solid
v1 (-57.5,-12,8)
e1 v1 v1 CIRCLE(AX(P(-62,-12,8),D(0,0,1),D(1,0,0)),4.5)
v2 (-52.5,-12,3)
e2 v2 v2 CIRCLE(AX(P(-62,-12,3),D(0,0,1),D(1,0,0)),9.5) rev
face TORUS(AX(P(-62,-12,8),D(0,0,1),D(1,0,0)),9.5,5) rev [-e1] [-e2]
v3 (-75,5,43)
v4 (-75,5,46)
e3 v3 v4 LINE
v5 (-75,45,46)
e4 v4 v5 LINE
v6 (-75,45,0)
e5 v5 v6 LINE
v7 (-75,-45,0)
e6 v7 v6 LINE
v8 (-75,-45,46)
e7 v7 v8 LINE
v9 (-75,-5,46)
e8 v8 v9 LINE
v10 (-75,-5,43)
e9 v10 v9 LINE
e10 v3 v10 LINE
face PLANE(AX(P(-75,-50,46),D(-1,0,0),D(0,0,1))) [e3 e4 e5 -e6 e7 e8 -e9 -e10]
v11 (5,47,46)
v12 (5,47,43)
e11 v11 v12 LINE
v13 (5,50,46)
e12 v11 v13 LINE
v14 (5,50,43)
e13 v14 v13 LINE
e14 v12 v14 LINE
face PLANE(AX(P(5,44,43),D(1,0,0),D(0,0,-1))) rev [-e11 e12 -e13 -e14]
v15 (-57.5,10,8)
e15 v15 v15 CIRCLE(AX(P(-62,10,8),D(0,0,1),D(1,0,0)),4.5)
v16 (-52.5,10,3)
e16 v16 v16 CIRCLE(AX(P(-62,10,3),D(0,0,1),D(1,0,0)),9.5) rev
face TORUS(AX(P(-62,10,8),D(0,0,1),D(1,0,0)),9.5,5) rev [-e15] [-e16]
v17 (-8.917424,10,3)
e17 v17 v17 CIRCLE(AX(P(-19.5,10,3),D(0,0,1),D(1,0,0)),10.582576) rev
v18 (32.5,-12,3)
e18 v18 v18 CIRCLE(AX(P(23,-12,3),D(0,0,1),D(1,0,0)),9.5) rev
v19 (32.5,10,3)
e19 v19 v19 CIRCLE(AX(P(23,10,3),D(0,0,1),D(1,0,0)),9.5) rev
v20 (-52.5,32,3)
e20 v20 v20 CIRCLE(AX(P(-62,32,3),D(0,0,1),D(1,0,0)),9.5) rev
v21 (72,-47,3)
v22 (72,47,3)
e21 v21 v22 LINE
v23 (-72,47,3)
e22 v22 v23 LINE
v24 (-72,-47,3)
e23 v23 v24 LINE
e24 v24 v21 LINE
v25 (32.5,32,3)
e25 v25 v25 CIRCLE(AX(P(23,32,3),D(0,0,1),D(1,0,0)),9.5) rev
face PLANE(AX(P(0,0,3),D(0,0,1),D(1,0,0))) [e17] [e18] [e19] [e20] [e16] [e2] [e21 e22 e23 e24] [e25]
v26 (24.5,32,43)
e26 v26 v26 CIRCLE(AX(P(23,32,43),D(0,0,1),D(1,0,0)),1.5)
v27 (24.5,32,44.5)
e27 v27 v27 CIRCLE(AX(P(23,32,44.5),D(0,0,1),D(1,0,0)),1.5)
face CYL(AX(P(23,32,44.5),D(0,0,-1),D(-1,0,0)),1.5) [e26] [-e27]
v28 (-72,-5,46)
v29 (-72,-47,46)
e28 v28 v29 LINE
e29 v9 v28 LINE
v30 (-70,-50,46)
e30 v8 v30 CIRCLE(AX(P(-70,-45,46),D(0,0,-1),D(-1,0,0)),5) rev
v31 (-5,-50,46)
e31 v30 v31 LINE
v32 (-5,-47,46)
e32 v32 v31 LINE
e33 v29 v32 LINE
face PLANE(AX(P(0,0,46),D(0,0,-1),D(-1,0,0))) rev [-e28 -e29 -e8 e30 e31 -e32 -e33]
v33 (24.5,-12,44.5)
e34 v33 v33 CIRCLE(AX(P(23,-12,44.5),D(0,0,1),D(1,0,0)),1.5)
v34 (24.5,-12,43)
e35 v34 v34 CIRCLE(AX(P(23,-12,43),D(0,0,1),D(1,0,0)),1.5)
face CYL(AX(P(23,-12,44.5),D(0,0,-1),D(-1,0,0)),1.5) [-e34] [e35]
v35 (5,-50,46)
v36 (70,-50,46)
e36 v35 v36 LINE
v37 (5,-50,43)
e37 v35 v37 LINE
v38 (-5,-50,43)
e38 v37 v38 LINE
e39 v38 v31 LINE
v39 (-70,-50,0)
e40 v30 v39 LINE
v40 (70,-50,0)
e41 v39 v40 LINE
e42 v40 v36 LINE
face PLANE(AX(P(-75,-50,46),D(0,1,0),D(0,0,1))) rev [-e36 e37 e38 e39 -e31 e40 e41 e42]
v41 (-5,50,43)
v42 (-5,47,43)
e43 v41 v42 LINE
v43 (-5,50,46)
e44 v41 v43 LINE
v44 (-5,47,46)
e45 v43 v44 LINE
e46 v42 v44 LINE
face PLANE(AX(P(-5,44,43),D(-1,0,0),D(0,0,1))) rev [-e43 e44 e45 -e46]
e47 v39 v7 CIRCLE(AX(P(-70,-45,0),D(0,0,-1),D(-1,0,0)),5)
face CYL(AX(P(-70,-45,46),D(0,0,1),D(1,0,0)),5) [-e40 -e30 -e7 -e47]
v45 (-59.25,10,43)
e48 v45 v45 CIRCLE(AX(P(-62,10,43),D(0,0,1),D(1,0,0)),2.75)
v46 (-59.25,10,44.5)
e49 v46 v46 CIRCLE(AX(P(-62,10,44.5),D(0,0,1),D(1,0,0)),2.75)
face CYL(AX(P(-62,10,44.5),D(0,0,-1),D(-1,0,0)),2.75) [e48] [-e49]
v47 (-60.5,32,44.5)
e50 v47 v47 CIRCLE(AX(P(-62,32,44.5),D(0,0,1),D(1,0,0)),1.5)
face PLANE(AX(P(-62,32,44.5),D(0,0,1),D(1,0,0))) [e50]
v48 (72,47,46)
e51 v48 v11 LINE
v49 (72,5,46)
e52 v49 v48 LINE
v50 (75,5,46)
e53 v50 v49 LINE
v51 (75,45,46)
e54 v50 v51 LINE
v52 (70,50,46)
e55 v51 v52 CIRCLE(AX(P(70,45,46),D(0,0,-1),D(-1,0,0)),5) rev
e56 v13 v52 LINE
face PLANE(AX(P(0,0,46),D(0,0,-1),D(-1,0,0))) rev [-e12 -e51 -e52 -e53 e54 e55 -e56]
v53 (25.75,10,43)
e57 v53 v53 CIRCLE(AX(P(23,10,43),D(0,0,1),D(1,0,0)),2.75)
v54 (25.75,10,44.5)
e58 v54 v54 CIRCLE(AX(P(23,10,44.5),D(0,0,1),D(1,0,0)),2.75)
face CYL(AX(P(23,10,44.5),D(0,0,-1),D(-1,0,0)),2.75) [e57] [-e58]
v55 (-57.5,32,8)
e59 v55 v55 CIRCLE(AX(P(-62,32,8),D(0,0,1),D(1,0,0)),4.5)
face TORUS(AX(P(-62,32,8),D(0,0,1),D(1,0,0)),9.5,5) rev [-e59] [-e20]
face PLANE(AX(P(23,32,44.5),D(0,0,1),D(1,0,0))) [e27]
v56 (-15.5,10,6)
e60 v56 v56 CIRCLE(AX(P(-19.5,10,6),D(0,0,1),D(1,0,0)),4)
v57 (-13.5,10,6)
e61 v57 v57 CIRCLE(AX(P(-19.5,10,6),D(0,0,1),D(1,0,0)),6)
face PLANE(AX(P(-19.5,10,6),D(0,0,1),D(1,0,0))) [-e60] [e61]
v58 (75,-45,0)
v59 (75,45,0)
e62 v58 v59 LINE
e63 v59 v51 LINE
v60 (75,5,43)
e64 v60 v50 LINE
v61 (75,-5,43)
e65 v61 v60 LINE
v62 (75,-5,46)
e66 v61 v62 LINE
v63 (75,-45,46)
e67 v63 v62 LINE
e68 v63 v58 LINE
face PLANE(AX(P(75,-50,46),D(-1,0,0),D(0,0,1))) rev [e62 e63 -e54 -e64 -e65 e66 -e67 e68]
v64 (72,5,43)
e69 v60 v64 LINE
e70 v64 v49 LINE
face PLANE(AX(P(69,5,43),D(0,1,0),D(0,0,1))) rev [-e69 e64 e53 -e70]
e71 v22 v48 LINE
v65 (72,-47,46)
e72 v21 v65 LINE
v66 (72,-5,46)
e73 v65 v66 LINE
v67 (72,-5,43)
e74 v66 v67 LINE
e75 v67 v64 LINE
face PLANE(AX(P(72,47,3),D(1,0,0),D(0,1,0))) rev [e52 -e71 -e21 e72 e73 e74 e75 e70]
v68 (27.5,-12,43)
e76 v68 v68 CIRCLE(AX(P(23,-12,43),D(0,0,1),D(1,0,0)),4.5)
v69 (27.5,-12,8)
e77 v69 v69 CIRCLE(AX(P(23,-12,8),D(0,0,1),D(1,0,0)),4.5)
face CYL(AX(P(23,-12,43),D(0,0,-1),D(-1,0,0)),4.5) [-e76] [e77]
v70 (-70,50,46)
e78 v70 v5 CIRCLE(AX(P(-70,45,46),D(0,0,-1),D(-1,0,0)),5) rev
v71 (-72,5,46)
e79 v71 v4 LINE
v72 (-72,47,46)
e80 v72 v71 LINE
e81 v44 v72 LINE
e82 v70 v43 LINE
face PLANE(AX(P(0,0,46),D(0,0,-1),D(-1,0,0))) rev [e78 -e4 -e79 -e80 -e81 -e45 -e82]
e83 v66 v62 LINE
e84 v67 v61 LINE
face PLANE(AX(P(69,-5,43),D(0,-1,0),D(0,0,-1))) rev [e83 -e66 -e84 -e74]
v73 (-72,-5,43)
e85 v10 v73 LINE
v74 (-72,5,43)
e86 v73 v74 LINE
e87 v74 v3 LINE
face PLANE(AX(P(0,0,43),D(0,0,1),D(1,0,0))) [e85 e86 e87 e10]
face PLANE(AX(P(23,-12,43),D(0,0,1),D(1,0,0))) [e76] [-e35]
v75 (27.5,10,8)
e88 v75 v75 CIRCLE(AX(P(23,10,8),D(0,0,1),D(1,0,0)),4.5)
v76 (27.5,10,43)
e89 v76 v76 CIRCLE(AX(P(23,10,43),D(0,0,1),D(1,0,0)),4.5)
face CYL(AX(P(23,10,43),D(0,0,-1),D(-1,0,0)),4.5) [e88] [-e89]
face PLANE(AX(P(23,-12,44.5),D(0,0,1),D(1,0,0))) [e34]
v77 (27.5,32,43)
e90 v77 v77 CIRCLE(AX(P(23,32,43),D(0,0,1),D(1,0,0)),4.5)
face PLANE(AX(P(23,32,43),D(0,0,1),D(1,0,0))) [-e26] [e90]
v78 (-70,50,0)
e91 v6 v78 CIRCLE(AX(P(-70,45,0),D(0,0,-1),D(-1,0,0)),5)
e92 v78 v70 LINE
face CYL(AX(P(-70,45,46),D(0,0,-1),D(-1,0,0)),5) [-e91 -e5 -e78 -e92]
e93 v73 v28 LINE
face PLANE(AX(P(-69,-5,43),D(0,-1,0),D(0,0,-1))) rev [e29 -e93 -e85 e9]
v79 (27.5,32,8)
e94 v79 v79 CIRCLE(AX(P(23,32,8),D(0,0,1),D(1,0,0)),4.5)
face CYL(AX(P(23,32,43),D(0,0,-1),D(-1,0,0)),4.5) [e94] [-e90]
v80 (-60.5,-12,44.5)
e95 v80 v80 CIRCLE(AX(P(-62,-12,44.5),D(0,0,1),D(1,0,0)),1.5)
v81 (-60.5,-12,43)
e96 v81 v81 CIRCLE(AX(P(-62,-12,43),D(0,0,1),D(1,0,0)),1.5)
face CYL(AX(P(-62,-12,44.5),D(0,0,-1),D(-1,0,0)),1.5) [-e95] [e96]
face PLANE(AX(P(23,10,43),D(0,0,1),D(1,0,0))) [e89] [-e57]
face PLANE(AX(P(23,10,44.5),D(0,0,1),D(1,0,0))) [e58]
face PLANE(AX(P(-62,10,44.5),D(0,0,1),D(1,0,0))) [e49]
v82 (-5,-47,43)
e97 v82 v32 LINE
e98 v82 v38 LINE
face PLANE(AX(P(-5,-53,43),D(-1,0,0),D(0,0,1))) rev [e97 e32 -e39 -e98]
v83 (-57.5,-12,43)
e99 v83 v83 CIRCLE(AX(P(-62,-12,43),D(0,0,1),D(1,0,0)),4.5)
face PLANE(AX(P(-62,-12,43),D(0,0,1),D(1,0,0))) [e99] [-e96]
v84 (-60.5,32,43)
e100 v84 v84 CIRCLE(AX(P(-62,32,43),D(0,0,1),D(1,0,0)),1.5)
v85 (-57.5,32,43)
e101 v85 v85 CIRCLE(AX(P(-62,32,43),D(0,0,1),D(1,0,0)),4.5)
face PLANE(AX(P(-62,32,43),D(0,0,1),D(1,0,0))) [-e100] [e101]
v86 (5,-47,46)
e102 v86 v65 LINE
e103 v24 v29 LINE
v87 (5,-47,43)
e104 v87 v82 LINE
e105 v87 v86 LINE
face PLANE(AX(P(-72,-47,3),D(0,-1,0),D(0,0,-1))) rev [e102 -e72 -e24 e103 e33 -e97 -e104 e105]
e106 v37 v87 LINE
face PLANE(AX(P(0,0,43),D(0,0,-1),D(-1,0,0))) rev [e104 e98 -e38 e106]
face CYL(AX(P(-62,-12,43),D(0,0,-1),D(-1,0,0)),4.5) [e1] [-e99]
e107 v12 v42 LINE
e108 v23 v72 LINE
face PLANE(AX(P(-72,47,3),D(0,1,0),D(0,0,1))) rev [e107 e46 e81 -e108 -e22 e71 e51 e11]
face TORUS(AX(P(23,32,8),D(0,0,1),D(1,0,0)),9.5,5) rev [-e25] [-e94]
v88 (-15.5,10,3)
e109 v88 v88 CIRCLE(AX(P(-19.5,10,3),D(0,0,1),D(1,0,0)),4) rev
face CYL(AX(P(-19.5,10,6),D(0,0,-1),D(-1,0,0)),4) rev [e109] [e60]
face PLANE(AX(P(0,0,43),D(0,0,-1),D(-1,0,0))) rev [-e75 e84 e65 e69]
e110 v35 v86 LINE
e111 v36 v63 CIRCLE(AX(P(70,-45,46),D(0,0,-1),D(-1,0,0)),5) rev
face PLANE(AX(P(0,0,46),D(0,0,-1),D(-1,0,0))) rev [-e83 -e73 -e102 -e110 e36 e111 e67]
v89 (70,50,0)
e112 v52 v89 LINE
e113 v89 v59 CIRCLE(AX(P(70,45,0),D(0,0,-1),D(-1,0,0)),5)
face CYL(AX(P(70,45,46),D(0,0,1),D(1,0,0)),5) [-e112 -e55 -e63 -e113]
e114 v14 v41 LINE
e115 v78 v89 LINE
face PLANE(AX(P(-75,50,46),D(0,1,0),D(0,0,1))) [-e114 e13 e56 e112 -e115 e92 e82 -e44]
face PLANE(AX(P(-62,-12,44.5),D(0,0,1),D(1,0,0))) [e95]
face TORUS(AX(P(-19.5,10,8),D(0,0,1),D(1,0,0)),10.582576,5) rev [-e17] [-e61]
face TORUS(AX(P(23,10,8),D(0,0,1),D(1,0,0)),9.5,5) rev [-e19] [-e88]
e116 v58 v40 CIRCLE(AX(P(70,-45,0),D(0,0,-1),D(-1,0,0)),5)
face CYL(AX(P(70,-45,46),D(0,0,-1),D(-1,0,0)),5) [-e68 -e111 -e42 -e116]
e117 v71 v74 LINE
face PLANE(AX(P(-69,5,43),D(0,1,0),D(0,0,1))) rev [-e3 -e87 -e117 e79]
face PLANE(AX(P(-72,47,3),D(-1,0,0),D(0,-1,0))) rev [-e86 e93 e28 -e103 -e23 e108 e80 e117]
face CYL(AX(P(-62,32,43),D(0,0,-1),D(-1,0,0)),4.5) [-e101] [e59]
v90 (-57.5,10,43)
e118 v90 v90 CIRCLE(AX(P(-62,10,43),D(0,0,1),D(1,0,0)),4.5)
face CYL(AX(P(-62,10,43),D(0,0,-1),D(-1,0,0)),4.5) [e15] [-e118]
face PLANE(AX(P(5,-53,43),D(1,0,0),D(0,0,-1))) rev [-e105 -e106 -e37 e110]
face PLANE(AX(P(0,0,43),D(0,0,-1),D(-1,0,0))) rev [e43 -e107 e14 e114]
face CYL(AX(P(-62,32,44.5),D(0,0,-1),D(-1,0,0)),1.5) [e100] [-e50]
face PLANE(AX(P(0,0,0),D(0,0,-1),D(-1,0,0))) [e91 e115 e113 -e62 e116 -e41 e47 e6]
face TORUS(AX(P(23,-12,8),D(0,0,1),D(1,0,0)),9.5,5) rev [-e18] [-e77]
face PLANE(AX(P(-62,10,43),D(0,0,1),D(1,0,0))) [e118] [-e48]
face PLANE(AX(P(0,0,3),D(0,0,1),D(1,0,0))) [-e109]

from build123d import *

# Parameters (mm, degrees)
SKETCH_1_W          = 150
SKETCH_1_H          = 100
EXTRUDE_1_DEPTH     = 46
SKETCH_3_W          = 144
SKETCH_3_H          = 94
CUT_EXTRUDE_2_DEPTH = 43
SKETCH_5_R          = 4.5
EXTRUDE_3_DEPTH     = 40
SKETCH_6_R          = 6
SKETCH_6_R_2        = 4
EXTRUDE_4_DEPTH     = 3
SKETCH_7_R          = 1.5
SKETCH_7_R_2        = 2.75
EXTRUDE_5_DEPTH     = 1.5
SKETCH_9_W          = 10
SKETCH_9_H          = 6
SKETCH_9_W_2        = 6
SKETCH_9_H_2        = 10
CUT_EXTRUDE_3_DEPTH = 3
FILLET_1_R          = 5


with BuildPart() as part:
    # 草图1 → 凸台-拉伸1 (new body)
    with BuildSketch(Plane.XY):
        Rectangle(SKETCH_1_W, SKETCH_1_H)
    extrude(amount=EXTRUDE_1_DEPTH)

    # 草图3 → 切除-拉伸2 (cut)
    with BuildSketch(Plane.XY.offset(46)):
        Rectangle(SKETCH_3_W, SKETCH_3_H)
    extrude(amount=-CUT_EXTRUDE_2_DEPTH, mode=Mode.SUBTRACT)

    # 草图5 → 凸台-拉伸3 (add)
    with BuildSketch(Plane.XY.offset(3)):
        with Locations((-62, 32)):
            Circle(SKETCH_5_R)
        with Locations((23, 32)):
            Circle(SKETCH_5_R)
        with Locations((-62, -12)):
            Circle(SKETCH_5_R)
        with Locations((23, -12)):
            Circle(SKETCH_5_R)
        with Locations((23, 10)):
            Circle(SKETCH_5_R)
        with Locations((-62, 10)):
            Circle(SKETCH_5_R)
    extrude(amount=EXTRUDE_3_DEPTH)

    # 草图6 → 凸台-拉伸4 (add)
    with BuildSketch(Plane.XY.offset(3)):
        with Locations((-19.5, 10)):
            Circle(SKETCH_6_R)
        with Locations((-19.5, 10)):
            Circle(SKETCH_6_R_2, mode=Mode.SUBTRACT)
    extrude(amount=EXTRUDE_4_DEPTH)

    # 草图7 → 凸台-拉伸5 (add)
    with BuildSketch(Plane.XY.offset(43)):
        with Locations((-62, 32)):
            Circle(SKETCH_7_R)
        with Locations((23, 32)):
            Circle(SKETCH_7_R)
        with Locations((-62, 10)):
            Circle(SKETCH_7_R_2)
        with Locations((23, 10)):
            Circle(SKETCH_7_R_2)
        with Locations((23, -12)):
            Circle(SKETCH_7_R)
        with Locations((-62, -12)):
            Circle(SKETCH_7_R)
    extrude(amount=EXTRUDE_5_DEPTH)

    # 草图9 → 切除-拉伸3 (cut)
    with BuildSketch(Plane.XY.offset(46)):
        with Locations((0, 47)):
            Rectangle(SKETCH_9_W, SKETCH_9_H)
        with Locations((0, -50)):
            Rectangle(SKETCH_9_W, SKETCH_9_H)
        with Locations((72, 0)):
            Rectangle(SKETCH_9_W_2, SKETCH_9_H_2)
        with Locations((-72, 0)):
            Rectangle(SKETCH_9_W_2, SKETCH_9_H_2)
    extrude(amount=-CUT_EXTRUDE_3_DEPTH, mode=Mode.SUBTRACT)

    # 圆角1
    # the kernel refuses this fillet: 5 mm, written as the material it adds along each edge
    with BuildSketch(Plane(origin=(-62, 32, 3), x_dir=(1, 0, 0), z_dir=(0, -1, 0))) as fillet_1_piece_1:
        with BuildLine():
            CenterArc((4.5 + FILLET_1_R, FILLET_1_R), FILLET_1_R, 180, 90)
            Line((4.5, FILLET_1_R), (4.5, 0))
            Line((4.5, 0), (4.5 + FILLET_1_R, 0))
        make_face()
    revolve(axis=Axis((-62, 32, 3), (0, 0, 1)))
    with BuildSketch(Plane(origin=(23, 32, 3), x_dir=(1, 0, 0), z_dir=(0, -1, 0))) as fillet_1_piece_2:
        with BuildLine():
            CenterArc((4.5 + FILLET_1_R, FILLET_1_R), FILLET_1_R, 180, 90)
            Line((4.5, FILLET_1_R), (4.5, 0))
            Line((4.5, 0), (4.5 + FILLET_1_R, 0))
        make_face()
    revolve(axis=Axis((23, 32, 3), (0, 0, 1)))
    with BuildSketch(Plane(origin=(-62, -12, 3), x_dir=(1, 0, 0), z_dir=(0, -1, 0))) as fillet_1_piece_3:
        with BuildLine():
            CenterArc((4.5 + FILLET_1_R, FILLET_1_R), FILLET_1_R, 180, 90)
            Line((4.5, FILLET_1_R), (4.5, 0))
            Line((4.5, 0), (4.5 + FILLET_1_R, 0))
        make_face()
    revolve(axis=Axis((-62, -12, 3), (0, 0, 1)))
    with BuildSketch(Plane(origin=(23, -12, 3), x_dir=(1, 0, 0), z_dir=(0, -1, 0))) as fillet_1_piece_4:
        with BuildLine():
            CenterArc((4.5 + FILLET_1_R, FILLET_1_R), FILLET_1_R, 180, 90)
            Line((4.5, FILLET_1_R), (4.5, 0))
            Line((4.5, 0), (4.5 + FILLET_1_R, 0))
        make_face()
    revolve(axis=Axis((23, -12, 3), (0, 0, 1)))
    with BuildSketch(Plane(origin=(23, 10, 3), x_dir=(1, 0, 0), z_dir=(0, -1, 0))) as fillet_1_piece_5:
        with BuildLine():
            CenterArc((4.5 + FILLET_1_R, FILLET_1_R), FILLET_1_R, 180, 90)
            Line((4.5, FILLET_1_R), (4.5, 0))
            Line((4.5, 0), (4.5 + FILLET_1_R, 0))
        make_face()
    revolve(axis=Axis((23, 10, 3), (0, 0, 1)))
    with BuildSketch(Plane(origin=(-62, 10, 3), x_dir=(1, 0, 0), z_dir=(0, -1, 0))) as fillet_1_piece_6:
        with BuildLine():
            CenterArc((4.5 + FILLET_1_R, FILLET_1_R), FILLET_1_R, 180, 90)
            Line((4.5, FILLET_1_R), (4.5, 0))
            Line((4.5, 0), (4.5 + FILLET_1_R, 0))
        make_face()
    revolve(axis=Axis((-62, 10, 3), (0, 0, 1)))
    with BuildSketch(Plane(origin=(-19.5, 10, 3), x_dir=(1, 0, 0), z_dir=(0, -1, 0))) as fillet_1_piece_7:
        with BuildLine():
            CenterArc((10.582575695, 5), FILLET_1_R, 203.578178478, 66.421821522)
            Line((6, 3), (6, 0))
            Line((6, 0), (10.582575695, 0))
        make_face()
    revolve(axis=Axis((-19.5, 10, 3), (0, 0, 1)))
    # the kernel refuses this fillet: 5 mm, written as the material it takes off along each edge
    with BuildSketch(Plane(origin=(-75, -50, -12.5), x_dir=(1, 0, 0), z_dir=(0, 0, 1)), Plane(origin=(-75, 50, -12.5), x_dir=(0, -1, 0), z_dir=(0, 0, 1))) as fillet_1_2_piece_1:
        with BuildLine():
            CenterArc((FILLET_1_R, FILLET_1_R), FILLET_1_R, 180, 90)
            Line((0, FILLET_1_R), (0, 0))
            Line((0, 0), (FILLET_1_R, 0))
        make_face()
    extrude(amount=71, mode=Mode.SUBTRACT)
    with BuildSketch(Plane(origin=(75, -50, -12.5), x_dir=(-1, 0, 0), z_dir=(0, 0, 1)), Plane(origin=(75, 50, -12.5), x_dir=(0, -1, 0), z_dir=(0, 0, 1))) as fillet_1_2_piece_2:
        with BuildLine():
            CenterArc((FILLET_1_R, -FILLET_1_R), FILLET_1_R, 90, 90)
            Line((0, -FILLET_1_R), (0, 0))
            Line((0, 0), (FILLET_1_R, 0))
        make_face()
    extrude(amount=71, mode=Mode.SUBTRACT)


solid = part.part
